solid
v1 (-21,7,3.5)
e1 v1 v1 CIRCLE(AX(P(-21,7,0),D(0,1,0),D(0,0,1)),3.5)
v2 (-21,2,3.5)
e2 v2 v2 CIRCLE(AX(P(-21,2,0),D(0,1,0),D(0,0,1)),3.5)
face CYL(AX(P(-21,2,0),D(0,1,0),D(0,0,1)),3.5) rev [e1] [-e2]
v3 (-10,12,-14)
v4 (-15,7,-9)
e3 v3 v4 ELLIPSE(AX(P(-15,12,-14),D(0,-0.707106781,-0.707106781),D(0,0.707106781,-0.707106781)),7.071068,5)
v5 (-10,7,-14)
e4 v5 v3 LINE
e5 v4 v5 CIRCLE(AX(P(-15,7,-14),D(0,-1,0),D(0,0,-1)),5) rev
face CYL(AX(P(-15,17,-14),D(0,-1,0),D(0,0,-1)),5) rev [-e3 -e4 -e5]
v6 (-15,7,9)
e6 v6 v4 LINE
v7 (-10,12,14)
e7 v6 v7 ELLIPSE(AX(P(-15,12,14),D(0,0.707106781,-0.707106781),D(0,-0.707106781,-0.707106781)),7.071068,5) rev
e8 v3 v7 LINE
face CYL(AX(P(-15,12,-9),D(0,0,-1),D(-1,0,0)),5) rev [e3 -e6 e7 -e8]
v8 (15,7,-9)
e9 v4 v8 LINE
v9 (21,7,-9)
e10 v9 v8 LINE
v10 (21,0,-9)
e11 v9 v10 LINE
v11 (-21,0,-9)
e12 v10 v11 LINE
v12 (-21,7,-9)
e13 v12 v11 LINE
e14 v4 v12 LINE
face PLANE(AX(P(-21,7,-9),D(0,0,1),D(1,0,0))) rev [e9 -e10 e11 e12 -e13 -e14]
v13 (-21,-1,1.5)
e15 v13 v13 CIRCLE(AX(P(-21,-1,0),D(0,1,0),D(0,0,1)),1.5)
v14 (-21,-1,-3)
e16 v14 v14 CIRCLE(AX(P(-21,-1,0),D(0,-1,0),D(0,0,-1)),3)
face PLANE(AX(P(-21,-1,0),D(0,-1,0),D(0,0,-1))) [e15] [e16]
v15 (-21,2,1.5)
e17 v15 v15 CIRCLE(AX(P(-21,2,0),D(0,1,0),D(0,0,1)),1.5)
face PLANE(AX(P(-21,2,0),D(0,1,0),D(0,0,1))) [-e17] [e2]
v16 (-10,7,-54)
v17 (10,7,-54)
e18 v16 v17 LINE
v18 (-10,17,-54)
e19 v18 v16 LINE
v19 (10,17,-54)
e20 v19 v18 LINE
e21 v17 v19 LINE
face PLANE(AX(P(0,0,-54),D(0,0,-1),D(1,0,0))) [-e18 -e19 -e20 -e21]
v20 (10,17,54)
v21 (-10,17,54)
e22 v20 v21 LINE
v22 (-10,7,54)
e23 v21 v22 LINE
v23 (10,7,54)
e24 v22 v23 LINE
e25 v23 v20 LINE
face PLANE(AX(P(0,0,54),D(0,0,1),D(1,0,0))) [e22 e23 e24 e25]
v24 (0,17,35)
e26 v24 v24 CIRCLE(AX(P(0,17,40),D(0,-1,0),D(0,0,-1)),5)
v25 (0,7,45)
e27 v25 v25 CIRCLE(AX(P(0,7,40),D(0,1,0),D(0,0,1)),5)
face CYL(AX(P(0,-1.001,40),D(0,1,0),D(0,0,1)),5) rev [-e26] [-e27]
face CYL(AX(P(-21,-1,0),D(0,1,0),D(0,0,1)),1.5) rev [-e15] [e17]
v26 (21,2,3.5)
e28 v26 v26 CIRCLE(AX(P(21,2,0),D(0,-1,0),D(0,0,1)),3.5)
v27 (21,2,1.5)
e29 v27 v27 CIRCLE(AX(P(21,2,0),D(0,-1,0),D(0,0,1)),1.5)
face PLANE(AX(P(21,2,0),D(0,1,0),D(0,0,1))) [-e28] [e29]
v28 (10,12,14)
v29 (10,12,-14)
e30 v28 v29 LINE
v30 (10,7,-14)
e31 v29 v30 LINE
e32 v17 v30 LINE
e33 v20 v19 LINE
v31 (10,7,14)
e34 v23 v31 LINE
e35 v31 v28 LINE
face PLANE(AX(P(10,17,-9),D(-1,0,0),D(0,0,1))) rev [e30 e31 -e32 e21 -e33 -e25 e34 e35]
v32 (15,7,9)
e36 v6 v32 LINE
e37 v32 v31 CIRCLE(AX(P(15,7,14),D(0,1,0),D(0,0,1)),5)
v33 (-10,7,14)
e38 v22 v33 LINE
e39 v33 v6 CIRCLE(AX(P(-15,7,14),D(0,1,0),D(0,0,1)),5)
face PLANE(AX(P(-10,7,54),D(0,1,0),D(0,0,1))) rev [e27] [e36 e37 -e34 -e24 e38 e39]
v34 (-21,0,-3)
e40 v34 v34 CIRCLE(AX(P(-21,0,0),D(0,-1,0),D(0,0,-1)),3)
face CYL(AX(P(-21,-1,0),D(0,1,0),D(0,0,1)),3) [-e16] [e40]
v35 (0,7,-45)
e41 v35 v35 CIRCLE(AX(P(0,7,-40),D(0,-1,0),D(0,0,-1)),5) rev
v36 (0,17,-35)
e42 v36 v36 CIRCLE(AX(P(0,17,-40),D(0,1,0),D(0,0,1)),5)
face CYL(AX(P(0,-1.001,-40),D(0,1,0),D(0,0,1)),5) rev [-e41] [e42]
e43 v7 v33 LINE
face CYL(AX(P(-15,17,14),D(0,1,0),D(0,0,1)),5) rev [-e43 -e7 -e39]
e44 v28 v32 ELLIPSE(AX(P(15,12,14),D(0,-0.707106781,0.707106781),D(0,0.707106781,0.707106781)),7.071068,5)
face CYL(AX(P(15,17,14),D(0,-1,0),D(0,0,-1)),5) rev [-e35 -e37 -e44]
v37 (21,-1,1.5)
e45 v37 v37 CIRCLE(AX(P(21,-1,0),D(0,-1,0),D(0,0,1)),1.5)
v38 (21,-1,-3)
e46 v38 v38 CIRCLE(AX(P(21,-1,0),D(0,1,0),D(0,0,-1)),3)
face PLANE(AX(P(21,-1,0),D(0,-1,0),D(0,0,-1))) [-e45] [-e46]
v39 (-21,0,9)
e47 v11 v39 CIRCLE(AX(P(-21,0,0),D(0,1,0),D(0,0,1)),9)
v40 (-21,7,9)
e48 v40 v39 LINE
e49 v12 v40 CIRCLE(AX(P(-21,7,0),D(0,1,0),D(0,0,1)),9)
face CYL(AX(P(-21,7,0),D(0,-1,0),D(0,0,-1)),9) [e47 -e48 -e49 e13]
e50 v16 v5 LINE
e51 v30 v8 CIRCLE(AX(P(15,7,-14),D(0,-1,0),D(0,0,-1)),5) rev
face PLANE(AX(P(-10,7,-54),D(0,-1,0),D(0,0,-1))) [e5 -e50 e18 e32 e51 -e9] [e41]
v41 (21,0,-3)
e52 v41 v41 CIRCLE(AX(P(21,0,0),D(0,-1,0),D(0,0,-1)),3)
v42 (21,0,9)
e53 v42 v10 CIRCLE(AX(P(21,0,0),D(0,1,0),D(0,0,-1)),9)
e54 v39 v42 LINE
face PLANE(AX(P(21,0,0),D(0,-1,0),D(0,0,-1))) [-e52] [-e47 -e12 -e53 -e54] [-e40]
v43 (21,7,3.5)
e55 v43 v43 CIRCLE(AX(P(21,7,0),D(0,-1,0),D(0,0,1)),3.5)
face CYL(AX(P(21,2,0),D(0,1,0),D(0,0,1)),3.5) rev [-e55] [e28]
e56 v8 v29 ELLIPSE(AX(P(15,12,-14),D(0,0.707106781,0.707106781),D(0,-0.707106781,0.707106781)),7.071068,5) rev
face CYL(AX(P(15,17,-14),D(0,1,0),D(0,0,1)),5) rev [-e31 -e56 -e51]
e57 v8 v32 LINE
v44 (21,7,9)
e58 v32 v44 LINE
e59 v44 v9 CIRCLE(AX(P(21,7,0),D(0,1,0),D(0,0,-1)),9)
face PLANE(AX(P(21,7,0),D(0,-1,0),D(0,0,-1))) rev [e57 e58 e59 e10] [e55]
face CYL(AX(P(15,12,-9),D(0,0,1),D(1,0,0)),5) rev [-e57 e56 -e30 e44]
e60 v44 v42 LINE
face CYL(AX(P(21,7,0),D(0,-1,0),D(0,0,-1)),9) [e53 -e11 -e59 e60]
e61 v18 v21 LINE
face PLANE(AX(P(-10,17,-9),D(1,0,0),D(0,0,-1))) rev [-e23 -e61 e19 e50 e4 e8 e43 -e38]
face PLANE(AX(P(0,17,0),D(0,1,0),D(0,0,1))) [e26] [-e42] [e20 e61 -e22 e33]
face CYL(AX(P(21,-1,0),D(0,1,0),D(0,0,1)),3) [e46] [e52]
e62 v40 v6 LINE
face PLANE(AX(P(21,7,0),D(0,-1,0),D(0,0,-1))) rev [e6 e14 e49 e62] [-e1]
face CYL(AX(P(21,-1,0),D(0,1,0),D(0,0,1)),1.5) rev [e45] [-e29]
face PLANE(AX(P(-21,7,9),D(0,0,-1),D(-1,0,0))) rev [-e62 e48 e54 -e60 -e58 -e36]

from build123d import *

# Parameters (mm, degrees)
BOSS_EXTRUDE1_DEPTH = 7
SKETCH2_R           = 3
BOSS_EXTRUDE2_DEPTH = 1
SKETCH3_R           = 3.5
CUT_EXTRUDE1_DEPTH  = 5
SKETCH4_R           = 1.5
CUT_EXTRUDE2_DEPTH  = 32.717503054
SKETCH17_W          = 20
SKETCH17_H          = 18
BOSS_EXTRUDE6_DEPTH = 10
SKETCH18_W          = 20
SKETCH18_H          = 10
BOSS_EXTRUDE7_DEPTH = 45
CUT_EXTRUDE6_REACH  = 66.343
SKETCH19_R          = 5
FILLET4_R           = 5
FILLET6_R           = 5
FILLET8_R           = 5


with BuildPart() as part:
    # Sketch1 → Boss-Extrude1 (new body)
    with BuildSketch(Plane(origin=(0, 0, 0), x_dir=(1, 0, 0), z_dir=(0, 1, 0))):
        with BuildLine():
            Line((-21, 9), (21, 9))
            ThreePointArc((21, 9), (30, 0), (21, -9))
            Line((21, -9), (-21, -9))
            ThreePointArc((-21, -9), (-30, 0), (-21, 9))
        make_face()
    extrude(amount=BOSS_EXTRUDE1_DEPTH)

    # Sketch2 → Boss-Extrude2 (add)
    with BuildSketch(Plane.XZ):
        with Locations(Location((-21, 0, 0), (0, 0, 270))):
            Circle(SKETCH2_R)
    boss_extrude2 = extrude(amount=BOSS_EXTRUDE2_DEPTH)

    # Sketch3 → Cut-Extrude1 (cut)
    with BuildSketch(Plane(origin=(0, 7, 0), x_dir=(1, 0, 0), z_dir=(0, 1, 0))):
        with Locations(Location((-21, 0, 0), (0, 0, 270))):
            Circle(SKETCH3_R)
    cut_extrude1 = extrude(amount=-CUT_EXTRUDE1_DEPTH, mode=Mode.SUBTRACT)

    # Sketch4 → Cut-Extrude2 (cut, through all)
    with BuildSketch(Plane(origin=(0, 2, 0), x_dir=(1, 0, 0), z_dir=(0, 1, 0))):
        with Locations(Location((-21, 0, 0), (0, 0, 270))):
            Circle(SKETCH4_R)
    cut_extrude2 = extrude(amount=-CUT_EXTRUDE2_DEPTH, mode=Mode.SUBTRACT)

    # Mirror1: Boss-Extrude2, Cut-Extrude1, Cut-Extrude2 across plane
    add(boss_extrude2.mirror(Plane(origin=(0, 0, 0), x_dir=(0, 0, 1), z_dir=(1, 0, 0))))
    add(cut_extrude1.mirror(Plane(origin=(0, 0, 0), x_dir=(0, 0, 1), z_dir=(1, 0, 0))), mode=Mode.SUBTRACT)
    add(cut_extrude2.mirror(Plane(origin=(0, 0, 0), x_dir=(0, 0, 1), z_dir=(1, 0, 0))), mode=Mode.SUBTRACT)

    # Sketch17 → Boss-Extrude6 (add)
    with BuildSketch(Plane(origin=(0, 7, 0), x_dir=(1, 0, 0), z_dir=(0, 1, 0))):
        Rectangle(SKETCH17_W, SKETCH17_H)
    extrude(amount=BOSS_EXTRUDE6_DEPTH)

    # Sketch18 → Boss-Extrude7 (add)
    with BuildSketch(Plane.XY.offset(9)):
        with Locations((0, 12)):
            Rectangle(SKETCH18_W, SKETCH18_H)
    boss_extrude7 = extrude(amount=BOSS_EXTRUDE7_DEPTH)

    # Mirror3: Boss-Extrude7 across plane
    add(boss_extrude7.mirror(Plane.XY))

    # Sketch19 → Cut-Extrude6 (cut, up to next)
    with BuildSketch(Plane(origin=(0, 17, 0), x_dir=(1, 0, 0), z_dir=(0, 1, 0)), mode=Mode.PRIVATE) as cut_extrude6_sk1:
        with Locations(Location((0, 40, 0), (0, 0, 270))):
            Circle(SKETCH19_R)
    cut_extrude6_tool1 = extrude(cut_extrude6_sk1.sketch, amount=-CUT_EXTRUDE6_REACH, mode=Mode.PRIVATE) & part.part
    cut_extrude6 = cut_extrude6_tool1.solids().sort_by_distance((0, 17, -40))[0]
    add(cut_extrude6, mode=Mode.SUBTRACT)

    # Mirror4: Cut-Extrude6 across plane
    add(cut_extrude6.mirror(Plane.XY), mode=Mode.SUBTRACT)

    # Fillet4
    fillet4_edges = [part.edges().sort_by_distance(p)[0] for p in [
        (10, 7, 0),
    ]]
    fillet(fillet4_edges, radius=FILLET4_R)

    # Fillet6
    fillet6_edges = [part.edges().sort_by_distance(p)[0] for p in [
        (-10, 7, 0),
    ]]
    fillet(fillet6_edges, radius=FILLET6_R)

    # Fillet8
    fillet8_edges = [part.edges().sort_by_distance(p)[0] for p in [
        (-10, 9.5, 9),
        (-10, 9.5, -9),
        (10, 9.5, -9),
        (10, 9.5, 9),
    ]]
    fillet(fillet8_edges, radius=FILLET8_R - 0.0001)  # a hair under: the kernel refuses the full size


solid = part.part
